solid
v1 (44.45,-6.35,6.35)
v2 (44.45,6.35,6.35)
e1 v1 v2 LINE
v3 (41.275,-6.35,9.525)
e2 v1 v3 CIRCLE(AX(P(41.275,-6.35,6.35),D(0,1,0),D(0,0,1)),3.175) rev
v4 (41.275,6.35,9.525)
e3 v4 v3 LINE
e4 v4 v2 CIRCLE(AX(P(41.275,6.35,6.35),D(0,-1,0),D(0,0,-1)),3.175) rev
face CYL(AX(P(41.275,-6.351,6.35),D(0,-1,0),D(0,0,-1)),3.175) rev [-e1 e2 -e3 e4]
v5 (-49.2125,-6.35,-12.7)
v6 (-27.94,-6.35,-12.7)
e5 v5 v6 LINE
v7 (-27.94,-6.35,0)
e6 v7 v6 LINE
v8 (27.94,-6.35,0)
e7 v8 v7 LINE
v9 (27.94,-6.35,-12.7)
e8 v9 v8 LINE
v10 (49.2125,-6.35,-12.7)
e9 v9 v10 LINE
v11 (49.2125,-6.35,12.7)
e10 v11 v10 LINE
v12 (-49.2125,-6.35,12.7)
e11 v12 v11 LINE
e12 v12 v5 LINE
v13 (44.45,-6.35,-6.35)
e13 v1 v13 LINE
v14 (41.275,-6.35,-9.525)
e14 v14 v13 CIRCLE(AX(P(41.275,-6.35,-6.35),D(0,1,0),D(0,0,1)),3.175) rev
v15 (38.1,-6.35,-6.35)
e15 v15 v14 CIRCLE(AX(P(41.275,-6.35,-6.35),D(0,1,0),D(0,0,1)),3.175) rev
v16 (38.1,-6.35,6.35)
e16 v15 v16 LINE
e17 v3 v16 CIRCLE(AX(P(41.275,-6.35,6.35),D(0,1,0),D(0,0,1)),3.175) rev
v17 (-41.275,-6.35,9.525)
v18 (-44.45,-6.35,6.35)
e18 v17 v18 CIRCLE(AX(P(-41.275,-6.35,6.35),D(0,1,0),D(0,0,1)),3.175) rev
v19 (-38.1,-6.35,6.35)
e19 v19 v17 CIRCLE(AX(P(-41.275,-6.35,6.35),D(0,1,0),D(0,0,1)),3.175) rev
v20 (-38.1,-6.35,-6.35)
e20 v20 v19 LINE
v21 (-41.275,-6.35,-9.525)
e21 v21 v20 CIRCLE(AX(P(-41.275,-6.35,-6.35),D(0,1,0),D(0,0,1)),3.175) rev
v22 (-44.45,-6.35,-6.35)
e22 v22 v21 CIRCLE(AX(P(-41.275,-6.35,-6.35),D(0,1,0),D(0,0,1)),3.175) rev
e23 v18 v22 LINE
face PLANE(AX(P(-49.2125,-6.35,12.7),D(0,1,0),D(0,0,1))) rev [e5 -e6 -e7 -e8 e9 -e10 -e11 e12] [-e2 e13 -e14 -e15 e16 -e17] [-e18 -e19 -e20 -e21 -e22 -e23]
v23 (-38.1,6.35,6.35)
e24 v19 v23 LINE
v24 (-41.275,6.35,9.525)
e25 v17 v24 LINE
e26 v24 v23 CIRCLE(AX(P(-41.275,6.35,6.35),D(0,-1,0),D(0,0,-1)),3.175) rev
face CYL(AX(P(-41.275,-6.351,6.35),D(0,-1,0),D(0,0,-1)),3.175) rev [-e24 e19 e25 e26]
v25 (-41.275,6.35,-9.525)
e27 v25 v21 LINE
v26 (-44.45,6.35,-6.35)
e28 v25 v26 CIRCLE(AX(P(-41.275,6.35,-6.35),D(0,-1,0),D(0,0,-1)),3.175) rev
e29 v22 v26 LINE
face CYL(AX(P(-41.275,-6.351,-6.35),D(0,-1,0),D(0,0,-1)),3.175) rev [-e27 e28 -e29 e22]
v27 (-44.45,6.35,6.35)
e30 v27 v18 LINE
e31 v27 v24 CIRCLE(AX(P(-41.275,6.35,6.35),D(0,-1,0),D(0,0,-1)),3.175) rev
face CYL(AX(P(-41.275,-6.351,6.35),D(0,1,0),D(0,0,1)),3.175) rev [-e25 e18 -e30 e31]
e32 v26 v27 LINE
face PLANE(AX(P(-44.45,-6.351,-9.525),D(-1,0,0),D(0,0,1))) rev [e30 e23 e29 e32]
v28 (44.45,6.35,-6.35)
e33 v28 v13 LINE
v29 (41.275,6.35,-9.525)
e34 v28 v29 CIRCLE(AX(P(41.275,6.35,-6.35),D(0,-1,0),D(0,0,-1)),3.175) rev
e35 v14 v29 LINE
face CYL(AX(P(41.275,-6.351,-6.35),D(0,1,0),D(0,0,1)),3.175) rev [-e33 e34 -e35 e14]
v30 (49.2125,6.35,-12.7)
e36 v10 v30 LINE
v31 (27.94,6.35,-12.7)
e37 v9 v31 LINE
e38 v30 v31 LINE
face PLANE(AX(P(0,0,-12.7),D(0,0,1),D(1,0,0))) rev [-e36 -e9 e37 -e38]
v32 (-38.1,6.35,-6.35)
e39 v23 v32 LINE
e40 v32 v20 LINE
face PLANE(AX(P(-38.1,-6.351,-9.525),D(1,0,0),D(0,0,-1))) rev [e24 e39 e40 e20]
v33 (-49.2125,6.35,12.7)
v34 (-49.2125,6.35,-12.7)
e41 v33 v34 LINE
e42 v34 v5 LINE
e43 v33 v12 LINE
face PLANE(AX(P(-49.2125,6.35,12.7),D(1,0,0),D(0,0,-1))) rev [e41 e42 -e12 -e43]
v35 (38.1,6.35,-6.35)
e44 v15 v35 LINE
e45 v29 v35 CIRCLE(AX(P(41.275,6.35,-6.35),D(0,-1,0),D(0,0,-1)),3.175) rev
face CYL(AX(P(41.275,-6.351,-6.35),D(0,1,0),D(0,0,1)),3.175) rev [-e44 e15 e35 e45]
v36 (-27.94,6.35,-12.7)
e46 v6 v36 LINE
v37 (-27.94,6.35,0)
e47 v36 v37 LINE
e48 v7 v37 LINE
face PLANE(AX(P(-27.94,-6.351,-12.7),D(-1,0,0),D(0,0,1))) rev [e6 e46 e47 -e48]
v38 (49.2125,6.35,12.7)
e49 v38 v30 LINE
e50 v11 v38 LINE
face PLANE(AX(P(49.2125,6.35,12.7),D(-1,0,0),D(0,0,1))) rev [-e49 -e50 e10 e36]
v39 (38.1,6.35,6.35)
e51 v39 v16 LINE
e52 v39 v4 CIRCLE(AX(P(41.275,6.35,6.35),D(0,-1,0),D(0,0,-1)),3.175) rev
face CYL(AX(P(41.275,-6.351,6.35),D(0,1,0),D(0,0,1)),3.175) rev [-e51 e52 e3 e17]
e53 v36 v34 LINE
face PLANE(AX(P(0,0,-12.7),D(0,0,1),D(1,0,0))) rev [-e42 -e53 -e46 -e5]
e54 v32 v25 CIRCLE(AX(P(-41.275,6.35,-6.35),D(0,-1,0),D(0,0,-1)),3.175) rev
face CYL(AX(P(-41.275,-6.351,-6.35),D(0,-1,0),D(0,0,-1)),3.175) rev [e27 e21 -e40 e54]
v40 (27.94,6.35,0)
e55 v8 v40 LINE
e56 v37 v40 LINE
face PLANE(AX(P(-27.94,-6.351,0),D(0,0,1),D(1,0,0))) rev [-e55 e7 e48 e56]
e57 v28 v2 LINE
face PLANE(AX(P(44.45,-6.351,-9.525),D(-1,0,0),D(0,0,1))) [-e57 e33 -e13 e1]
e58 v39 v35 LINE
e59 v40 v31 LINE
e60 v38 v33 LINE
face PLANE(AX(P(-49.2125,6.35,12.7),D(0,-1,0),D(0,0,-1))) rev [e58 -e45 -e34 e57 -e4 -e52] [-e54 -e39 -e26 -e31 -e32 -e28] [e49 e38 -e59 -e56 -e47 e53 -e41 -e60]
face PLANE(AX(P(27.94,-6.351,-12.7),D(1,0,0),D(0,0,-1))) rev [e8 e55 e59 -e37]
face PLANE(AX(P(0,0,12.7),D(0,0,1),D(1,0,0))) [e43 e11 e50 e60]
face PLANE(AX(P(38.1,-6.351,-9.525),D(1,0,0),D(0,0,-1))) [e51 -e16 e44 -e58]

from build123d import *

# Parameters (mm, degrees)
SKETCH1_W            = 98.425
SKETCH1_H            = 12.7
BOSS_EXTRUDE1_DEPTH  = 12.7
CUT_EXTRUDE1_REACH   = 54.388
SKETCH2_W            = 6.35
SKETCH2_H            = 19.05
FILLET1_R            = 3.175
FILLET2_R            = 3.175
FILLET3_R            = 3.175
FILLET4_R            = 3.175
FILLET1_OF_MIRROR1_R = 3.175
FILLET2_OF_MIRROR1_R = 3.175
FILLET3_OF_MIRROR1_R = 3.175
FILLET4_OF_MIRROR1_R = 3.175
CUT_EXTRUDE2_REACH   = 54.388
SKETCH5_W            = 55.88
SKETCH5_H            = 12.7


with BuildPart() as part:
    # Sketch1 → Boss-Extrude1 (new, symmetric)
    with BuildSketch(Plane.XY):
        Rectangle(SKETCH1_W, SKETCH1_H)
    extrude(amount=BOSS_EXTRUDE1_DEPTH, both=True)

    # Sketch2 → Cut-Extrude1 (cut, up to next)
    with BuildSketch(Plane(origin=(0, 6.35, 0), x_dir=(1, 0, 0), z_dir=(0, 1, 0)), mode=Mode.PRIVATE) as cut_extrude1_sk1:
        with Locations((-41.275, 0)):
            Rectangle(SKETCH2_W, SKETCH2_H)
    cut_extrude1_tool1 = extrude(cut_extrude1_sk1.sketch, amount=-CUT_EXTRUDE1_REACH, mode=Mode.PRIVATE) & part.part
    cut_extrude1 = cut_extrude1_tool1.solids().sort_by_distance((-41.275, 6.35, 0))[0]
    add(cut_extrude1, mode=Mode.SUBTRACT)

    # Fillet1
    fillet1_edges = [part.edges().sort_by_distance(p)[0] for p in [
        (-44.45, 0, -9.525),
    ]]
    fillet(fillet1_edges, radius=FILLET1_R)

    # Fillet2
    fillet2_edges = [part.edges().sort_by_distance(p)[0] for p in [
        (-38.1, 0, -9.525),
    ]]
    fillet(fillet2_edges, radius=FILLET2_R - 0.0001)  # a hair under: the kernel refuses the full size

    # Fillet3
    fillet3_edges = [part.edges().sort_by_distance(p)[0] for p in [
        (-44.45, 0, 9.525),
    ]]
    fillet(fillet3_edges, radius=FILLET3_R)

    # Fillet4
    fillet4_edges = [part.edges().sort_by_distance(p)[0] for p in [
        (-38.1, 0, 9.525),
    ]]
    fillet(fillet4_edges, radius=FILLET4_R - 0.0001)  # a hair under: the kernel refuses the full size

    # Mirror1: Cut-Extrude1 across plane
    add(cut_extrude1.mirror(Plane(origin=(0, 0, 0), x_dir=(0, 0, 1), z_dir=(1, 0, 0))), mode=Mode.SUBTRACT)

    # Fillet1 of Mirror1
    fillet1_of_mirror1_edges = [part.edges().sort_by_distance(p)[0] for p in [
        (44.45, 0, -9.525),
    ]]
    fillet(fillet1_of_mirror1_edges, radius=FILLET1_OF_MIRROR1_R)

    # Fillet2 of Mirror1
    fillet2_of_mirror1_edges = [part.edges().sort_by_distance(p)[0] for p in [
        (38.1, 0, -9.525),
    ]]
    fillet(fillet2_of_mirror1_edges, radius=FILLET2_OF_MIRROR1_R - 0.0001)  # a hair under: the kernel refuses the full size

    # Fillet3 of Mirror1
    fillet3_of_mirror1_edges = [part.edges().sort_by_distance(p)[0] for p in [
        (44.45, 0, 9.525),
    ]]
    fillet(fillet3_of_mirror1_edges, radius=FILLET3_OF_MIRROR1_R)

    # Fillet4 of Mirror1
    fillet4_of_mirror1_edges = [part.edges().sort_by_distance(p)[0] for p in [
        (38.1, 0, 9.525),
    ]]
    fillet(fillet4_of_mirror1_edges, radius=FILLET4_OF_MIRROR1_R - 0.0001)  # a hair under: the kernel refuses the full size

    # Sketch5 → Cut-Extrude2 (cut, up to next)
    with BuildSketch(Plane(origin=(0, 6.35, 0), x_dir=(1, 0, 0), z_dir=(0, 1, 0)), mode=Mode.PRIVATE) as cut_extrude2_sk1:
        with Locations((0, 6.35)):
            Rectangle(SKETCH5_W, SKETCH5_H)
    cut_extrude2_tool1 = extrude(cut_extrude2_sk1.sketch, amount=-CUT_EXTRUDE2_REACH, mode=Mode.PRIVATE) & part.part
    add(cut_extrude2_tool1.solids().sort_by_distance((0, 6.35, -6.35))[0], mode=Mode.SUBTRACT)


solid = part.part
